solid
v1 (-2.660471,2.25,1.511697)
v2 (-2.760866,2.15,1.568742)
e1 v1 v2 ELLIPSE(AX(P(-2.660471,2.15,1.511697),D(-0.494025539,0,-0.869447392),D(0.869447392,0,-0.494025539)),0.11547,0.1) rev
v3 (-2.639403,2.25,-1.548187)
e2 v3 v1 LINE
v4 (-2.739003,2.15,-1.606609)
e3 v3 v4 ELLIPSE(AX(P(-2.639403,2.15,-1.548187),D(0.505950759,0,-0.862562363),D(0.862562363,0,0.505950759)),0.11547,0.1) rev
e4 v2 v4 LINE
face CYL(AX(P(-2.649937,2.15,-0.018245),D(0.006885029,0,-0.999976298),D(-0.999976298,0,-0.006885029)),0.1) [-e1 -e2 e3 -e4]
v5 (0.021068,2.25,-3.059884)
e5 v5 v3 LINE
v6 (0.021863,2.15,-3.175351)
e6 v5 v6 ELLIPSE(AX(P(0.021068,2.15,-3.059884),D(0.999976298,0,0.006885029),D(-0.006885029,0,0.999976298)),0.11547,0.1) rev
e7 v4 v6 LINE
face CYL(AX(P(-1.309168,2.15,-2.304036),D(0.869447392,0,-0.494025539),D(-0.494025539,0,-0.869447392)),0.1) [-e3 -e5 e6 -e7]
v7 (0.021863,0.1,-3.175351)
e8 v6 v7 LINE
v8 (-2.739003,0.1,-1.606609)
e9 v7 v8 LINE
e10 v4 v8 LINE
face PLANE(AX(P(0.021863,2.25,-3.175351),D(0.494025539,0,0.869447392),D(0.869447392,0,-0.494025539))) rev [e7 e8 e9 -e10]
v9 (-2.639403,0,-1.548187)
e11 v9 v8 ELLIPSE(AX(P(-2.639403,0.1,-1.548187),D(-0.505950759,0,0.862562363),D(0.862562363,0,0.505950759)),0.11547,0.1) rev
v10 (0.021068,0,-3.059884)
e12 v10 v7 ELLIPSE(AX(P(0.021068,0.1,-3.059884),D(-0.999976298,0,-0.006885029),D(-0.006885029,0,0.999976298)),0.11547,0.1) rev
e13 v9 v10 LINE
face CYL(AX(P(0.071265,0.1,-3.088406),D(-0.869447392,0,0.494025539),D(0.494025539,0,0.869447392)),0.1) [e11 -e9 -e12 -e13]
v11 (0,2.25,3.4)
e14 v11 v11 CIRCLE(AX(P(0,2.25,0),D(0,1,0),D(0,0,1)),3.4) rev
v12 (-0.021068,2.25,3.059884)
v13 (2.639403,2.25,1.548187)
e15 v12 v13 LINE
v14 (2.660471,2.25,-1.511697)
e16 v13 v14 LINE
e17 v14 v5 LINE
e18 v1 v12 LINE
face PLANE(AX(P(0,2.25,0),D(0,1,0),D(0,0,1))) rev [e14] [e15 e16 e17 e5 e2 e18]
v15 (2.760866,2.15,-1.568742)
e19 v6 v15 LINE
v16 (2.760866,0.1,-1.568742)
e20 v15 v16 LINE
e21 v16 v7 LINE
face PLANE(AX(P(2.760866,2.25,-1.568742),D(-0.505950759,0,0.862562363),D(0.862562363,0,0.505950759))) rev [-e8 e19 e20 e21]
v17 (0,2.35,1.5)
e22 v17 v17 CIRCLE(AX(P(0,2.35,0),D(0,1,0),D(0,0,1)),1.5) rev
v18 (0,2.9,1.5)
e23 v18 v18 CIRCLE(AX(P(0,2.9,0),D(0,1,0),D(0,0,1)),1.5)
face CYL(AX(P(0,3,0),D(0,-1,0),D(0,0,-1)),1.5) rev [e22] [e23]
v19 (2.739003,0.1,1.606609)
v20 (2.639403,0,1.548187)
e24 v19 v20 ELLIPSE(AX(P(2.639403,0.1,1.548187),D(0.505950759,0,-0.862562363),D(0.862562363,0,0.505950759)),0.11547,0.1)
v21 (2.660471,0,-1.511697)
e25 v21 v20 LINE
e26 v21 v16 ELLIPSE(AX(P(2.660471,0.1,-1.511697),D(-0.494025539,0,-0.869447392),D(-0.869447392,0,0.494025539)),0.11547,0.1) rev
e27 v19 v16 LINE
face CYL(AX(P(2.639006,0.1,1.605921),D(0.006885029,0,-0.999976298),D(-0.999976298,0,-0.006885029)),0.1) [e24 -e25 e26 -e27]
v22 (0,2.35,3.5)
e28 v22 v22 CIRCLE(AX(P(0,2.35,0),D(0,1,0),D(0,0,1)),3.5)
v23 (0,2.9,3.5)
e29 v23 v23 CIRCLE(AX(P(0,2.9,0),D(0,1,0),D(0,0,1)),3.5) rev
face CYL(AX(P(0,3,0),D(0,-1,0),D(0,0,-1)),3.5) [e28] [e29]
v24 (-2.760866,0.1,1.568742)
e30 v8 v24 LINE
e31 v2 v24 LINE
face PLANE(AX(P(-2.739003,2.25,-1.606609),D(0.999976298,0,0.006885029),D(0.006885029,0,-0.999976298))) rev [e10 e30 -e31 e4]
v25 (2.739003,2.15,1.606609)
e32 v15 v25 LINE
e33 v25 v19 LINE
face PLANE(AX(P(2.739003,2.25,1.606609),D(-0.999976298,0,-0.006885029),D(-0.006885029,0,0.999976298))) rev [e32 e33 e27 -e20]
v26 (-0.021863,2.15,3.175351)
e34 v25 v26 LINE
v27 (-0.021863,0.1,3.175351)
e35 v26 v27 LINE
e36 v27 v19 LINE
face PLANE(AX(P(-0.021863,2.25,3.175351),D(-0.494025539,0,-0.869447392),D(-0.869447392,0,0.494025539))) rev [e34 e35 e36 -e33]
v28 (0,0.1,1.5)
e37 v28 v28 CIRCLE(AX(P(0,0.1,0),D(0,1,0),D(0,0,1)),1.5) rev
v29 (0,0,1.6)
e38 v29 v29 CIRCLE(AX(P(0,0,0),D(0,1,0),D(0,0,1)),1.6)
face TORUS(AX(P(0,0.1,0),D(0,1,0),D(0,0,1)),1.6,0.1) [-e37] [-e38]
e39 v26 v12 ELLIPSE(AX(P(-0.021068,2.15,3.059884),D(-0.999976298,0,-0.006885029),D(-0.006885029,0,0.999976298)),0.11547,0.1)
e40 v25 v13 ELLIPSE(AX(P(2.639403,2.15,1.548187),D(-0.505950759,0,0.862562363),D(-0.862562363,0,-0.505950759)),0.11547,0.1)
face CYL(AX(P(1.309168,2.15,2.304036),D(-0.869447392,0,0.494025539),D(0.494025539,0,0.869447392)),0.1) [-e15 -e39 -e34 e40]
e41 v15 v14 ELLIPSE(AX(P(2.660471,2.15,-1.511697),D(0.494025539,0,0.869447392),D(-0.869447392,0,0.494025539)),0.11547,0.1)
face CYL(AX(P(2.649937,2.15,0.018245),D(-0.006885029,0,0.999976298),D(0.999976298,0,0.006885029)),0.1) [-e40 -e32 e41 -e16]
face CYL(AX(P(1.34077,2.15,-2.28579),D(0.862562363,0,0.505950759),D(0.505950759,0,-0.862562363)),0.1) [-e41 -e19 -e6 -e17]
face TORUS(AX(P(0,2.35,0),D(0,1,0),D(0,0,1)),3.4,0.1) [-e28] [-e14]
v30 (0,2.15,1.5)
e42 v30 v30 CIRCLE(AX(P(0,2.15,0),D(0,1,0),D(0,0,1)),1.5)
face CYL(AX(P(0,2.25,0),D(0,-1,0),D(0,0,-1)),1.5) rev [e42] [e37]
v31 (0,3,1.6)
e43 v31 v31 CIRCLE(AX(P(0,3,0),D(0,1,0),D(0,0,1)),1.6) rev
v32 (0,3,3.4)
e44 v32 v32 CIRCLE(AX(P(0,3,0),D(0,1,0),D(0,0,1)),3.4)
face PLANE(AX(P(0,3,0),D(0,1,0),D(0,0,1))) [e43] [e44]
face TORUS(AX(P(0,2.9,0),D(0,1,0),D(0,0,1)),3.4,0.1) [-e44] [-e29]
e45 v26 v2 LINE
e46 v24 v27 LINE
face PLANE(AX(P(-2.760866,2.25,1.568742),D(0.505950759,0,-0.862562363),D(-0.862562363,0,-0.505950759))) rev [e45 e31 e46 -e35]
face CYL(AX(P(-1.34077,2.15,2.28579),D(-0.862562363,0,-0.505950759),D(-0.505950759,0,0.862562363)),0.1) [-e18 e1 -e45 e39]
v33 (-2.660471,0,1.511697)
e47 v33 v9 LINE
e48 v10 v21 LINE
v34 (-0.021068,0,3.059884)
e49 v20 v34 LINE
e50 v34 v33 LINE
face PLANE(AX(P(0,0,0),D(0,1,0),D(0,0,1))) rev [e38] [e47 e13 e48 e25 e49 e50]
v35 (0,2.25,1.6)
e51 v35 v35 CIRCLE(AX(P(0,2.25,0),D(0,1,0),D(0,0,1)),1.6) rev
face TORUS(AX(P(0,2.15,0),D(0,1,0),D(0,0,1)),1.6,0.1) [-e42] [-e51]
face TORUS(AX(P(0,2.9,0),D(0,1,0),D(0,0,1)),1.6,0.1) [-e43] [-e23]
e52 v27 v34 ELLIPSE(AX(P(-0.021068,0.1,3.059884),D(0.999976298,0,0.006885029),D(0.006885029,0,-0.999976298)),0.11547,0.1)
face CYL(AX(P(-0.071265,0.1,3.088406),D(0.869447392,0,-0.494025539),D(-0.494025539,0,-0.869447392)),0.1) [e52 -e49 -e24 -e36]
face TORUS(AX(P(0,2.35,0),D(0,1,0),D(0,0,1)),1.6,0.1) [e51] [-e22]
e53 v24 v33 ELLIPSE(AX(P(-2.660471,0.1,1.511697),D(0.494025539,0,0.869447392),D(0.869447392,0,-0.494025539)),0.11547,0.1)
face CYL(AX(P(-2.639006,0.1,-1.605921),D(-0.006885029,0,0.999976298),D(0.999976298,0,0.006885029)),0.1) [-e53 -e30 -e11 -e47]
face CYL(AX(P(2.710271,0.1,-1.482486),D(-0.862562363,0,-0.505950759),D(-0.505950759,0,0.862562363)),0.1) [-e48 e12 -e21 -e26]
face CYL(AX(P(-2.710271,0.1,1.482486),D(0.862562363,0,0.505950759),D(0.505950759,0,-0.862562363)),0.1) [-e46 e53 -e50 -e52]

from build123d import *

# Parameters (mm, degrees)
SKETCH1_R           = 1.5
BOSS_EXTRUDE1_DEPTH = 2.25
FILLET1_R           = 0.1
SKETCH2_R           = 3.5
SKETCH2_R_2         = 1.5
BOSS_EXTRUDE2_DEPTH = 0.75
FILLET2_R           = 0.1


with BuildPart() as part:
    # Sketch1 → Boss-Extrude1 (new body)
    with BuildSketch(Plane(origin=(0, 0, 0), x_dir=(1, 0, 0), z_dir=(0, 1, 0))):
        Polygon((2.739003368, -1.606609438), (2.760866271, 1.568741778), (0.021862903, 3.175351216), (-2.739003368, 1.606609438), (-2.760866271, -1.568741778), (-0.021862903, -3.175351216), align=None)
        with Locations(Location((0, 0, 0), (0, 0, 270))):
            Circle(SKETCH1_R, mode=Mode.SUBTRACT)
    extrude(amount=BOSS_EXTRUDE1_DEPTH)

    # Fillet1
    fillet1_edges = [part.edges().sort_by_distance(p)[0] for p in [
        (1.391364587, 2.25, -2.372046497),
        (-1.358570232, 2.25, -2.390980327),
        (-2.749934819, 2.25, -0.01893383),
        (0, 0, -1.5),
        (0, 2.25, -1.5),
        (-1.391364587, 2.25, 2.372046497),
        (1.358570232, 2.25, 2.390980327),
        (-1.391364587, 0, 2.372046497),
        (-2.749934819, 0, -0.01893383),
        (-1.358570232, 0, -2.390980327),
        (2.749934819, 2.25, 0.01893383),
        (1.391364587, 0, -2.372046497),
        (2.749934819, 0, 0.01893383),
        (1.358570232, 0, 2.390980327),
    ]]
    fillet(fillet1_edges, radius=FILLET1_R)

    # Sketch2 → Boss-Extrude2 (add)
    with BuildSketch(Plane(origin=(0, 2.25, 0), x_dir=(1, 0, 0), z_dir=(0, 1, 0))):
        with Locations(Location((0, 0, 0), (0, 0, 270))):
            Circle(SKETCH2_R)
        with Locations(Location((0, 0, 0), (0, 0, 270))):
            Circle(SKETCH2_R_2, mode=Mode.SUBTRACT)
    extrude(amount=BOSS_EXTRUDE2_DEPTH)

    # Fillet2
    fillet2_edges = [part.edges().sort_by_distance(p)[0] for p in [
        (0, 2.25, -1.5),
        (0, 3, -3.5),
        (0, 2.25, -3.5),
        (0, 3, -1.5),
    ]]
    fillet(fillet2_edges, radius=FILLET2_R - 0.0001)  # a hair under: the kernel refuses the full size


solid = part.part
